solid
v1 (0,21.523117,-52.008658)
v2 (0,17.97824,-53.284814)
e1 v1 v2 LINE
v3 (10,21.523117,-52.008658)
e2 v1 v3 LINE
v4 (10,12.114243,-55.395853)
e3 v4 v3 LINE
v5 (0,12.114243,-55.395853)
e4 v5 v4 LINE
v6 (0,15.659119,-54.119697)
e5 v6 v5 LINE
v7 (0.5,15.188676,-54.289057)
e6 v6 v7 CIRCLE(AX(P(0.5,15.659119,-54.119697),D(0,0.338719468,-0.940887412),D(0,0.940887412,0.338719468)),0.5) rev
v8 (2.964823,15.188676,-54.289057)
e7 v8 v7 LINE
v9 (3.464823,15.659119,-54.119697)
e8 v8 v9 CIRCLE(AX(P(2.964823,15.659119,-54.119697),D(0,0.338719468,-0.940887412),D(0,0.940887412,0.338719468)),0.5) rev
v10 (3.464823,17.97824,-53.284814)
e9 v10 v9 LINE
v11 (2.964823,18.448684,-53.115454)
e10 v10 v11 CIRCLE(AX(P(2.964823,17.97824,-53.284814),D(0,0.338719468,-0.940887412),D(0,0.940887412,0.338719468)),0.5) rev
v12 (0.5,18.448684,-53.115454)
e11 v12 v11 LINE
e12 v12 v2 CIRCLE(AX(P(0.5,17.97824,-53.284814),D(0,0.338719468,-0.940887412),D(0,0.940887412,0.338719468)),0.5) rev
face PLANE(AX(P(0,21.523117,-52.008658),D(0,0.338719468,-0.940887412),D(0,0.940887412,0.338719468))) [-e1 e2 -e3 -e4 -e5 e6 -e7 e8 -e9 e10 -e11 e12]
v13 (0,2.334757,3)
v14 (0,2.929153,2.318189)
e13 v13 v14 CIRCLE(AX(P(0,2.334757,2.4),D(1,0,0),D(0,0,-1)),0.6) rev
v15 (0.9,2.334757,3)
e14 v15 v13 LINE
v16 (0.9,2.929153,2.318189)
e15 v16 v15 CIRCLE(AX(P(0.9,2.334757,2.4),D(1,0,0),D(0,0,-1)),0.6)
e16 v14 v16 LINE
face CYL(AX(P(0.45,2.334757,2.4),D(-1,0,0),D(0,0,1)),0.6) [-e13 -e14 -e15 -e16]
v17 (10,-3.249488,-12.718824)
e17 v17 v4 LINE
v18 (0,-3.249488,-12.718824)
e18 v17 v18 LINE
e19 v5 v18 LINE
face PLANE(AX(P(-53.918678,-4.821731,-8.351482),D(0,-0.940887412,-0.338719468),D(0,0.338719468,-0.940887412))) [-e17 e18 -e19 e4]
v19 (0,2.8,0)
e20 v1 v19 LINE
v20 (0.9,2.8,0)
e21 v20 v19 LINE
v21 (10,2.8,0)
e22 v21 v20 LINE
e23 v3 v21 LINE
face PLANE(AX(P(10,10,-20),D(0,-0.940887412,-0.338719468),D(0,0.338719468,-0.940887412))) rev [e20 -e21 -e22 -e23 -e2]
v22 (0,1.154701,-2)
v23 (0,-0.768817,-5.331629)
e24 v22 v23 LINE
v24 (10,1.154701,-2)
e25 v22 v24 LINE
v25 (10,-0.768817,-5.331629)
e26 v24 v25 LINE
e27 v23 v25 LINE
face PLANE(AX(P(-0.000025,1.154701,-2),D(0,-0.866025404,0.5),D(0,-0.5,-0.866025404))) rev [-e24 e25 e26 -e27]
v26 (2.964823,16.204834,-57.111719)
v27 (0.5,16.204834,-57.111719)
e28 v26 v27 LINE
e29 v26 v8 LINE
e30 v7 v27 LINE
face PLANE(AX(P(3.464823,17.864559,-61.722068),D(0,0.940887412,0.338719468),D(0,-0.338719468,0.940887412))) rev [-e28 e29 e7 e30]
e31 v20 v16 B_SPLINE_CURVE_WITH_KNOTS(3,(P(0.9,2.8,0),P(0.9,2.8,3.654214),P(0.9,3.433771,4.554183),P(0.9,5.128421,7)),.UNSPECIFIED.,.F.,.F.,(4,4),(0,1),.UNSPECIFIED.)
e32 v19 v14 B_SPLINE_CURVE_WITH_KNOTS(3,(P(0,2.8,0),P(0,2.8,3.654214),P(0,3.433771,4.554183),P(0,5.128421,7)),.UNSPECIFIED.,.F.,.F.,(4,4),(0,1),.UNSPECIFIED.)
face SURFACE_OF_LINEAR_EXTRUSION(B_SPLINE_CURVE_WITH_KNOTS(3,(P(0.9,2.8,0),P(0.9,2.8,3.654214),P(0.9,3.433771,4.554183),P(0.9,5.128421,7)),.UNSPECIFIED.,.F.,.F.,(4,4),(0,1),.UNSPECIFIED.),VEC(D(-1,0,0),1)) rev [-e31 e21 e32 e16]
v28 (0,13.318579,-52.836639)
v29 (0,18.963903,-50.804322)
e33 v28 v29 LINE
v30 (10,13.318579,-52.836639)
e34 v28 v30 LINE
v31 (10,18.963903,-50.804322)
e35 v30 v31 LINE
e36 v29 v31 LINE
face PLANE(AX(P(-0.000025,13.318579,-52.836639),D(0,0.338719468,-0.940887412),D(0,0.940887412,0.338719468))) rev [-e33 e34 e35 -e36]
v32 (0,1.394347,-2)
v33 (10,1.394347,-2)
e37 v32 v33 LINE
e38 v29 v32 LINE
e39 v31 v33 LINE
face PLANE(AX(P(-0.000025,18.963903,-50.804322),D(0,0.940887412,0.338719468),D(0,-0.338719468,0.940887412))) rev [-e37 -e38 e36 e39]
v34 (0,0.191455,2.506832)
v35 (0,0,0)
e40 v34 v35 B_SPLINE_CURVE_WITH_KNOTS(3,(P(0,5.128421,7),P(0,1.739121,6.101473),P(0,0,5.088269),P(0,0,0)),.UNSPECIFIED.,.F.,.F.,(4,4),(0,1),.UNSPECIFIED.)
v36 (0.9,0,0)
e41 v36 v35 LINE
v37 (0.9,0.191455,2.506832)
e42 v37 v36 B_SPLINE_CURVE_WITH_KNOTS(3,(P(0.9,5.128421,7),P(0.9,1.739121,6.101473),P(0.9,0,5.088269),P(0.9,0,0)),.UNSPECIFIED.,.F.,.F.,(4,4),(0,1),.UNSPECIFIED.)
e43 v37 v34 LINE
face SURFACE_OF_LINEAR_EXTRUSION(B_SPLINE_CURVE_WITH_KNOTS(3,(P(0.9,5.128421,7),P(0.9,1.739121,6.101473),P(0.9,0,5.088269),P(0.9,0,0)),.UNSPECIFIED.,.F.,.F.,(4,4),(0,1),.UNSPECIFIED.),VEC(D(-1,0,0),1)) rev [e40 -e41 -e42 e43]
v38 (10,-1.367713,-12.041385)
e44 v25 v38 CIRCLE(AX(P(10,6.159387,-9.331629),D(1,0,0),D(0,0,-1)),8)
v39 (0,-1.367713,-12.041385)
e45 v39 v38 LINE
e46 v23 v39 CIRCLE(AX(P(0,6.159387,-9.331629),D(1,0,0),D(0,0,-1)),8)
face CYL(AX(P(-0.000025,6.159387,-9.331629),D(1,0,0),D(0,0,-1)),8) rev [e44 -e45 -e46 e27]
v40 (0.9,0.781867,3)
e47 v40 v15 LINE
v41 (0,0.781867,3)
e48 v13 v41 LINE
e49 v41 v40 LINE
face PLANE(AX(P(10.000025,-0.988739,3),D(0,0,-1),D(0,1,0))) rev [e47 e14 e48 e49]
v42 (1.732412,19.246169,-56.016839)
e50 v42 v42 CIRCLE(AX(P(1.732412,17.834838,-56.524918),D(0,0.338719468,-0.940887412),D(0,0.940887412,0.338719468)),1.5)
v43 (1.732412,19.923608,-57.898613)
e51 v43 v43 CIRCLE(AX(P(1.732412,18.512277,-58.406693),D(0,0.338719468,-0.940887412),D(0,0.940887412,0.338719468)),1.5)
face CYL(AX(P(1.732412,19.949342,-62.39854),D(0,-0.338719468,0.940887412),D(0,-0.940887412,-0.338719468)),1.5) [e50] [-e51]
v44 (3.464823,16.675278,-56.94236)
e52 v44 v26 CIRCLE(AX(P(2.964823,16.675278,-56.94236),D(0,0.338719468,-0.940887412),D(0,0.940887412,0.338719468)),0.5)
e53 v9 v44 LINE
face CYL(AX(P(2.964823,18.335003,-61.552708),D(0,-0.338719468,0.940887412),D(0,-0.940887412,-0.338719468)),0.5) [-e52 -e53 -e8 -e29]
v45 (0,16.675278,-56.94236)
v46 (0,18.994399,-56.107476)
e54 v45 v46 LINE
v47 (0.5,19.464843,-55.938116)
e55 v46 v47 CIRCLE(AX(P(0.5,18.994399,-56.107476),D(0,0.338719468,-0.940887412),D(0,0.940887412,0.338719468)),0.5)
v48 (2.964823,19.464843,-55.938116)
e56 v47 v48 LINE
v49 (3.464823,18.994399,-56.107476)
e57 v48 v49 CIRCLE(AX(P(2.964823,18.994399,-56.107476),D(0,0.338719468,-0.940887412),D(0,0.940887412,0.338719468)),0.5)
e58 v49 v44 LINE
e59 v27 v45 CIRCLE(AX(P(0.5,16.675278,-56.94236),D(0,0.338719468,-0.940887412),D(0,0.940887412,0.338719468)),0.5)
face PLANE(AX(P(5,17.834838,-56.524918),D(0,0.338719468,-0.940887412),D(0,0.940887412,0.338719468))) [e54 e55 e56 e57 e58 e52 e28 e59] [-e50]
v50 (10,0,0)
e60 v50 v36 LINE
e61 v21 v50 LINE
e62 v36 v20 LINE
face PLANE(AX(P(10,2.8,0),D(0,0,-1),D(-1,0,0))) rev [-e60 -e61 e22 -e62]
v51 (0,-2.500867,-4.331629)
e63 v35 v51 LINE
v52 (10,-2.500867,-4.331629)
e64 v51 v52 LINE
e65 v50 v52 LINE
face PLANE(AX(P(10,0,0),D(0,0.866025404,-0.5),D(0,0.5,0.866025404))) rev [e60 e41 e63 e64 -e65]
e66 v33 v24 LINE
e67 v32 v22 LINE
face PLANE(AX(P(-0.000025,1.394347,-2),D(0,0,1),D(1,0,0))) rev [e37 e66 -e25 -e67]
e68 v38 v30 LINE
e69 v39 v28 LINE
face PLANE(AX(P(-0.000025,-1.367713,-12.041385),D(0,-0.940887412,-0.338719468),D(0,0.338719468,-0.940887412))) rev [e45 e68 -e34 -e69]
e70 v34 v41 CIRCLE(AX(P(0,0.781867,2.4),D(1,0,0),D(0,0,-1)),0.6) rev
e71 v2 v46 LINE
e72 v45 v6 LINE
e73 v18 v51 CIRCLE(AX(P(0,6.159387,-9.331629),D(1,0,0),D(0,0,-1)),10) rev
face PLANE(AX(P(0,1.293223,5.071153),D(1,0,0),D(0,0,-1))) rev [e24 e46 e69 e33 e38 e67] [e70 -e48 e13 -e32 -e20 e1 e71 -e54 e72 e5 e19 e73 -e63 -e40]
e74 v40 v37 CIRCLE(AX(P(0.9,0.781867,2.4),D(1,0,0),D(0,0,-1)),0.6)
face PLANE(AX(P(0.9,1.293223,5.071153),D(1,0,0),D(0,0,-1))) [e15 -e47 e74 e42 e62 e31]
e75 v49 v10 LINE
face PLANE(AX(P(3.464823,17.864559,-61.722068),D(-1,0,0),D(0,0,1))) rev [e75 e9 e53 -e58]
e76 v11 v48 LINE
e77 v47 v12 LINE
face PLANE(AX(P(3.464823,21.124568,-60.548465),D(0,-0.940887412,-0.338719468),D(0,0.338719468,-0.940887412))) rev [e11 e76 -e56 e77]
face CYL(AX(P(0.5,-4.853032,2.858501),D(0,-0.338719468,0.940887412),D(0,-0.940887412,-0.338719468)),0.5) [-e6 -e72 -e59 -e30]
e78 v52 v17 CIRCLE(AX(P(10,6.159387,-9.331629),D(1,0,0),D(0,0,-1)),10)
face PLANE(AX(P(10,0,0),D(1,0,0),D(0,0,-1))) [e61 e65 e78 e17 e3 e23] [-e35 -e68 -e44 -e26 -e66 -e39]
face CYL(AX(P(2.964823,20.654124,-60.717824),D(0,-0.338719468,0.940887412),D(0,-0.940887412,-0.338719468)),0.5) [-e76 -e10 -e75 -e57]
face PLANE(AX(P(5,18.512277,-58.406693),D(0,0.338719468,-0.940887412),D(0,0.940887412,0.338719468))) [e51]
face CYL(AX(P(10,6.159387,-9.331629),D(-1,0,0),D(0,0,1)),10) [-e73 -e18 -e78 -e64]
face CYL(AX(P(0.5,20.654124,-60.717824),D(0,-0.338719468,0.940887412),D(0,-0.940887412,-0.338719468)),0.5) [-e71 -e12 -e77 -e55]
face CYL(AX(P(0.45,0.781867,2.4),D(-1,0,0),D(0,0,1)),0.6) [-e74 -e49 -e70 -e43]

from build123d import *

# Parameters (mm, degrees)
BOSS_EXTRUDE1_DEPTH = 0.9
FILLET1_R           = 0.5
BOSS_EXTRUDE2_DEPTH = 10
BOSS_EXTRUDE3_DEPTH = 10
BOSS_EXTRUDE4_DEPTH = 10
CUT_EXTRUDE2_DEPTH  = 61.26562122547703
FILLET2_R           = 10
CUT_EXTRUDE3_DEPTH  = 61.26562122547703
CUT_EXTRUDE4_DEPTH  = 61.265621208883815
FILLET3_R           = 0.6
SKETCH10_R          = 2.1
BOSS_EXTRUDE5_DEPTH = 3
SKETCH11_R          = 1.5
BOSS_EXTRUDE6_DEPTH = 2
BOSS_EXTRUDE7_DEPTH = 3
SKETCH14_R          = 1.5000000000000002
BOSS_EXTRUDE8_DEPTH = 2
FILLET4_R           = 0.5


# Read off the part's stored shape, not the designer's step: Split1
with BuildPart() as part:
    # Sketch1 → Boss-Extrude1 (new body)
    with BuildSketch(Plane(origin=(0, 0, 0), x_dir=(0, 0, -1), z_dir=(1, 0, 0))):
        with BuildLine():
            Line((0, 2.8), (0, 0))
            add(Edge.make_bspline(
                [(0, 0), (-5.0882686653691644, 0), (-6.101472647573343, 1.7391212131518174), (-7.000000000000001, 5.128421052631583)],
                knots=[0, 0, 0, 0, 1, 1, 1, 1], degree=3))
            add(Edge.make_bspline(
                [(-7.000000000000001, 5.128421052631583), (-4.554183023047009, 3.433770739772326), (-3.654213934684202, 2.799999999999996), (0, 2.8)],
                knots=[0, 0, 0, 0, 1, 1, 1, 1], degree=3))
        make_face()
    extrude(amount=BOSS_EXTRUDE1_DEPTH)

    # Fillet1
    fillet1_edges = [part.edges().sort_by_distance(p)[0] for p in [
        (0.45, 5.128421052631583, 7.000000000000001),
    ]]
    fillet(fillet1_edges, radius=FILLET1_R)

    # Sketch3 → Boss-Extrude2 (add)
    with BuildSketch(Plane(origin=(0, 0, 0), x_dir=(0, 0, -1), z_dir=(1, 0, 0))):
        Polygon((0, 0), (40, 0), (40, 10), (20, 9.999999999999998), (0, 2.8), align=None)
    extrude(amount=BOSS_EXTRUDE2_DEPTH)

    # Sketch5 → Boss-Extrude3 (add)
    with BuildSketch(Plane(origin=(0, 0, 0), x_dir=(0, 0, -1), z_dir=(1, 0, 0))):
        Polygon((0, 0), (20.000000000000004, -11.54700538379255), (40, -11.547005383792548), (40, 0), align=None)
    extrude(amount=BOSS_EXTRUDE3_DEPTH)

    # Sketch6 → Boss-Extrude4 (add)
    with BuildSketch(Plane(origin=(10, 0, 0), x_dir=(0, 0, -1), z_dir=(1, 0, 0))):
        Polygon((8.351482323931023, -4.821730567853972), (55.39585291736738, 12.114242845783108), (52.00865823463995, 21.523116964470375), (20, 9.999999999999998), align=None)
    extrude(amount=-BOSS_EXTRUDE4_DEPTH)

    # Sketch7 → Cut-Extrude2 (cut, through all)
    with BuildSketch(Plane(origin=(10, 0, 0), x_dir=(0, 0, -1), z_dir=(1, 0, 0))):
        Polygon((40, 6.571735795530855), (-6.396657859934056, -10.1310610340454), (25.03138273349842, -20.31963634568749), (52.56184703999606, -5.85197020171655), align=None)
    extrude(amount=-CUT_EXTRUDE2_DEPTH, mode=Mode.SUBTRACT)

    # Fillet2
    fillet2_edges = [part.edges().sort_by_distance(p)[0] for p in [
        (5, -4.821730567853985, -8.351482323931002),
    ]]
    fillet(fillet2_edges, radius=FILLET2_R)

    # Sketch8 → Cut-Extrude3 (cut, through all)
    with BuildSketch(Plane(origin=(10, 0, 0), x_dir=(0, 0, -1), z_dir=(1, 0, 0))):
        with BuildLine():
            Line((2, 1.15470053837925), (5.3316294573154766, -0.7688166256419326))
            ThreePointArc((5.3316294573154766, -0.7688166256419326), (8.6203969477251, -1.8089349449339256), (12.041385203497414, -1.3677126903162435))
            Line((12.041385203497414, -1.3677126903162435), (52.83663915708444, 13.318578732975077))
            Line((52.83663915708444, 13.318578732975077), (50.80432234744798, 18.963903204187442))
            Line((50.80432234744798, 18.963903204187442), (2, 1.394347159106174))
            Line((2, 1.394347159106174), (2, 1.15470053837925))
        make_face()
    extrude(amount=-CUT_EXTRUDE3_DEPTH, mode=Mode.SUBTRACT)

    # Sketch9 → Cut-Extrude4 (cut, through all)
    with BuildSketch(Plane.ZY):
        Polygon((3.0000000000000013, -0.988739395943905), (3.0000000000000004, 5.799008427986812), (9.091562908025708, 5.799008427986812), (9.091562908025708, -1.8536705996620422), align=None)
    extrude(amount=-CUT_EXTRUDE4_DEPTH, mode=Mode.SUBTRACT)

    # Fillet3
    fillet3_edges = [part.edges().sort_by_distance(p)[0] for p in [
        (0.45, 0.2958164494648414, 3.0000000000000013),
        (0.45, 3.0492242349736607, 3.000000000000001),
    ]]
    fillet(fillet3_edges, radius=FILLET3_R)

    # Sketch10 → Boss-Extrude5 (add)
    with BuildSketch(Plane(origin=(0, 19.04436342339395, -52.90100950942748), x_dir=(-1, 0, 0), z_dir=(0, 0.33871946827274263, -0.9408874118687265))):
        with Locations(Location((-5, -2.365515246767623, 0), (0, 0, 270))):
            Circle(SKETCH10_R)
    extrude(amount=BOSS_EXTRUDE5_DEPTH)

    # Sketch11 → Boss-Extrude6 (add)
    with BuildSketch(Plane(origin=(0, 20.060521828212188, -55.72367174503367), x_dir=(-1, 0, 0), z_dir=(0, 0.33871946827274263, -0.9408874118687265))):
        with Locations(Location((-5, -2.365515246767633, 0), (0, 0, 90))):
            Circle(SKETCH11_R)
    extrude(amount=BOSS_EXTRUDE6_DEPTH)


with BuildPart() as body_2:
    # Split1: the piece on the far side of the plane
    add(part.part)
    split(bisect_by=Plane(origin=(0, 19.044363423, -52.901009509), x_dir=(1, 0, 0), z_dir=(0, 0.33871946827274285, -0.9408874118687265)), keep=Keep.BOTTOM)


with BuildPart() as part_1:
    add(part.part)

    # Split1
    split(bisect_by=Plane(origin=(0, 19.044363423, -52.901009509), x_dir=(1, 0, 0), z_dir=(0, 0.33871946827274285, -0.9408874118687265)), keep=Keep.TOP)


with BuildPart() as body_3:
    # Sketch13 → Boss-Extrude7 (new body)
    with BuildSketch(Plane(origin=(0, 19.04436342339395, -52.90100950942748), x_dir=(-1, 0, 0), z_dir=(0, 0.33871946827274263, -0.9408874118687265))):
        Polygon((-3.4648232278140823, -4.097926860674667), (6e-17, -4.097926860674667), (4e-17, -0.6331036328605839), (-3.4648232278140823, -0.6331036328605846), align=None)
    extrude(amount=BOSS_EXTRUDE7_DEPTH)


with BuildPart() as body_4:
    # Sketch14 → Boss-Extrude8 (new body)
    with BuildSketch(Plane(origin=(0, 20.060521828212188, -55.72367174503367), x_dir=(-1, 0, 0), z_dir=(0, 0.33871946827274263, -0.9408874118687265))):
        with Locations(Location((-1.7324116139070413, -2.3655152467676324, 0), (0, 0, 90))):
            Circle(SKETCH14_R)
    extrude(amount=BOSS_EXTRUDE8_DEPTH)


with BuildPart() as body_2_1:
    add(body_2.part)

    # Combine1: union body 3, body 4
    add(body_3.part)
    add(body_4.part)

    # Fillet4
    fillet4_edges = [body_2_1.edges().sort_by_distance(p)[0] for p in [
        (-6e-17, 15.69675482783554, -55.70038823449888),
        (-4e-17, 18.95676338723618, -54.526785153114645),
        (3.4648232278140823, 18.95676338723618, -54.526785153114645),
        (3.4648232278140823, 15.69675482783554, -55.70038823449888),
    ]]
    fillet(fillet4_edges, radius=FILLET4_R)


solid = body_2_1.part
